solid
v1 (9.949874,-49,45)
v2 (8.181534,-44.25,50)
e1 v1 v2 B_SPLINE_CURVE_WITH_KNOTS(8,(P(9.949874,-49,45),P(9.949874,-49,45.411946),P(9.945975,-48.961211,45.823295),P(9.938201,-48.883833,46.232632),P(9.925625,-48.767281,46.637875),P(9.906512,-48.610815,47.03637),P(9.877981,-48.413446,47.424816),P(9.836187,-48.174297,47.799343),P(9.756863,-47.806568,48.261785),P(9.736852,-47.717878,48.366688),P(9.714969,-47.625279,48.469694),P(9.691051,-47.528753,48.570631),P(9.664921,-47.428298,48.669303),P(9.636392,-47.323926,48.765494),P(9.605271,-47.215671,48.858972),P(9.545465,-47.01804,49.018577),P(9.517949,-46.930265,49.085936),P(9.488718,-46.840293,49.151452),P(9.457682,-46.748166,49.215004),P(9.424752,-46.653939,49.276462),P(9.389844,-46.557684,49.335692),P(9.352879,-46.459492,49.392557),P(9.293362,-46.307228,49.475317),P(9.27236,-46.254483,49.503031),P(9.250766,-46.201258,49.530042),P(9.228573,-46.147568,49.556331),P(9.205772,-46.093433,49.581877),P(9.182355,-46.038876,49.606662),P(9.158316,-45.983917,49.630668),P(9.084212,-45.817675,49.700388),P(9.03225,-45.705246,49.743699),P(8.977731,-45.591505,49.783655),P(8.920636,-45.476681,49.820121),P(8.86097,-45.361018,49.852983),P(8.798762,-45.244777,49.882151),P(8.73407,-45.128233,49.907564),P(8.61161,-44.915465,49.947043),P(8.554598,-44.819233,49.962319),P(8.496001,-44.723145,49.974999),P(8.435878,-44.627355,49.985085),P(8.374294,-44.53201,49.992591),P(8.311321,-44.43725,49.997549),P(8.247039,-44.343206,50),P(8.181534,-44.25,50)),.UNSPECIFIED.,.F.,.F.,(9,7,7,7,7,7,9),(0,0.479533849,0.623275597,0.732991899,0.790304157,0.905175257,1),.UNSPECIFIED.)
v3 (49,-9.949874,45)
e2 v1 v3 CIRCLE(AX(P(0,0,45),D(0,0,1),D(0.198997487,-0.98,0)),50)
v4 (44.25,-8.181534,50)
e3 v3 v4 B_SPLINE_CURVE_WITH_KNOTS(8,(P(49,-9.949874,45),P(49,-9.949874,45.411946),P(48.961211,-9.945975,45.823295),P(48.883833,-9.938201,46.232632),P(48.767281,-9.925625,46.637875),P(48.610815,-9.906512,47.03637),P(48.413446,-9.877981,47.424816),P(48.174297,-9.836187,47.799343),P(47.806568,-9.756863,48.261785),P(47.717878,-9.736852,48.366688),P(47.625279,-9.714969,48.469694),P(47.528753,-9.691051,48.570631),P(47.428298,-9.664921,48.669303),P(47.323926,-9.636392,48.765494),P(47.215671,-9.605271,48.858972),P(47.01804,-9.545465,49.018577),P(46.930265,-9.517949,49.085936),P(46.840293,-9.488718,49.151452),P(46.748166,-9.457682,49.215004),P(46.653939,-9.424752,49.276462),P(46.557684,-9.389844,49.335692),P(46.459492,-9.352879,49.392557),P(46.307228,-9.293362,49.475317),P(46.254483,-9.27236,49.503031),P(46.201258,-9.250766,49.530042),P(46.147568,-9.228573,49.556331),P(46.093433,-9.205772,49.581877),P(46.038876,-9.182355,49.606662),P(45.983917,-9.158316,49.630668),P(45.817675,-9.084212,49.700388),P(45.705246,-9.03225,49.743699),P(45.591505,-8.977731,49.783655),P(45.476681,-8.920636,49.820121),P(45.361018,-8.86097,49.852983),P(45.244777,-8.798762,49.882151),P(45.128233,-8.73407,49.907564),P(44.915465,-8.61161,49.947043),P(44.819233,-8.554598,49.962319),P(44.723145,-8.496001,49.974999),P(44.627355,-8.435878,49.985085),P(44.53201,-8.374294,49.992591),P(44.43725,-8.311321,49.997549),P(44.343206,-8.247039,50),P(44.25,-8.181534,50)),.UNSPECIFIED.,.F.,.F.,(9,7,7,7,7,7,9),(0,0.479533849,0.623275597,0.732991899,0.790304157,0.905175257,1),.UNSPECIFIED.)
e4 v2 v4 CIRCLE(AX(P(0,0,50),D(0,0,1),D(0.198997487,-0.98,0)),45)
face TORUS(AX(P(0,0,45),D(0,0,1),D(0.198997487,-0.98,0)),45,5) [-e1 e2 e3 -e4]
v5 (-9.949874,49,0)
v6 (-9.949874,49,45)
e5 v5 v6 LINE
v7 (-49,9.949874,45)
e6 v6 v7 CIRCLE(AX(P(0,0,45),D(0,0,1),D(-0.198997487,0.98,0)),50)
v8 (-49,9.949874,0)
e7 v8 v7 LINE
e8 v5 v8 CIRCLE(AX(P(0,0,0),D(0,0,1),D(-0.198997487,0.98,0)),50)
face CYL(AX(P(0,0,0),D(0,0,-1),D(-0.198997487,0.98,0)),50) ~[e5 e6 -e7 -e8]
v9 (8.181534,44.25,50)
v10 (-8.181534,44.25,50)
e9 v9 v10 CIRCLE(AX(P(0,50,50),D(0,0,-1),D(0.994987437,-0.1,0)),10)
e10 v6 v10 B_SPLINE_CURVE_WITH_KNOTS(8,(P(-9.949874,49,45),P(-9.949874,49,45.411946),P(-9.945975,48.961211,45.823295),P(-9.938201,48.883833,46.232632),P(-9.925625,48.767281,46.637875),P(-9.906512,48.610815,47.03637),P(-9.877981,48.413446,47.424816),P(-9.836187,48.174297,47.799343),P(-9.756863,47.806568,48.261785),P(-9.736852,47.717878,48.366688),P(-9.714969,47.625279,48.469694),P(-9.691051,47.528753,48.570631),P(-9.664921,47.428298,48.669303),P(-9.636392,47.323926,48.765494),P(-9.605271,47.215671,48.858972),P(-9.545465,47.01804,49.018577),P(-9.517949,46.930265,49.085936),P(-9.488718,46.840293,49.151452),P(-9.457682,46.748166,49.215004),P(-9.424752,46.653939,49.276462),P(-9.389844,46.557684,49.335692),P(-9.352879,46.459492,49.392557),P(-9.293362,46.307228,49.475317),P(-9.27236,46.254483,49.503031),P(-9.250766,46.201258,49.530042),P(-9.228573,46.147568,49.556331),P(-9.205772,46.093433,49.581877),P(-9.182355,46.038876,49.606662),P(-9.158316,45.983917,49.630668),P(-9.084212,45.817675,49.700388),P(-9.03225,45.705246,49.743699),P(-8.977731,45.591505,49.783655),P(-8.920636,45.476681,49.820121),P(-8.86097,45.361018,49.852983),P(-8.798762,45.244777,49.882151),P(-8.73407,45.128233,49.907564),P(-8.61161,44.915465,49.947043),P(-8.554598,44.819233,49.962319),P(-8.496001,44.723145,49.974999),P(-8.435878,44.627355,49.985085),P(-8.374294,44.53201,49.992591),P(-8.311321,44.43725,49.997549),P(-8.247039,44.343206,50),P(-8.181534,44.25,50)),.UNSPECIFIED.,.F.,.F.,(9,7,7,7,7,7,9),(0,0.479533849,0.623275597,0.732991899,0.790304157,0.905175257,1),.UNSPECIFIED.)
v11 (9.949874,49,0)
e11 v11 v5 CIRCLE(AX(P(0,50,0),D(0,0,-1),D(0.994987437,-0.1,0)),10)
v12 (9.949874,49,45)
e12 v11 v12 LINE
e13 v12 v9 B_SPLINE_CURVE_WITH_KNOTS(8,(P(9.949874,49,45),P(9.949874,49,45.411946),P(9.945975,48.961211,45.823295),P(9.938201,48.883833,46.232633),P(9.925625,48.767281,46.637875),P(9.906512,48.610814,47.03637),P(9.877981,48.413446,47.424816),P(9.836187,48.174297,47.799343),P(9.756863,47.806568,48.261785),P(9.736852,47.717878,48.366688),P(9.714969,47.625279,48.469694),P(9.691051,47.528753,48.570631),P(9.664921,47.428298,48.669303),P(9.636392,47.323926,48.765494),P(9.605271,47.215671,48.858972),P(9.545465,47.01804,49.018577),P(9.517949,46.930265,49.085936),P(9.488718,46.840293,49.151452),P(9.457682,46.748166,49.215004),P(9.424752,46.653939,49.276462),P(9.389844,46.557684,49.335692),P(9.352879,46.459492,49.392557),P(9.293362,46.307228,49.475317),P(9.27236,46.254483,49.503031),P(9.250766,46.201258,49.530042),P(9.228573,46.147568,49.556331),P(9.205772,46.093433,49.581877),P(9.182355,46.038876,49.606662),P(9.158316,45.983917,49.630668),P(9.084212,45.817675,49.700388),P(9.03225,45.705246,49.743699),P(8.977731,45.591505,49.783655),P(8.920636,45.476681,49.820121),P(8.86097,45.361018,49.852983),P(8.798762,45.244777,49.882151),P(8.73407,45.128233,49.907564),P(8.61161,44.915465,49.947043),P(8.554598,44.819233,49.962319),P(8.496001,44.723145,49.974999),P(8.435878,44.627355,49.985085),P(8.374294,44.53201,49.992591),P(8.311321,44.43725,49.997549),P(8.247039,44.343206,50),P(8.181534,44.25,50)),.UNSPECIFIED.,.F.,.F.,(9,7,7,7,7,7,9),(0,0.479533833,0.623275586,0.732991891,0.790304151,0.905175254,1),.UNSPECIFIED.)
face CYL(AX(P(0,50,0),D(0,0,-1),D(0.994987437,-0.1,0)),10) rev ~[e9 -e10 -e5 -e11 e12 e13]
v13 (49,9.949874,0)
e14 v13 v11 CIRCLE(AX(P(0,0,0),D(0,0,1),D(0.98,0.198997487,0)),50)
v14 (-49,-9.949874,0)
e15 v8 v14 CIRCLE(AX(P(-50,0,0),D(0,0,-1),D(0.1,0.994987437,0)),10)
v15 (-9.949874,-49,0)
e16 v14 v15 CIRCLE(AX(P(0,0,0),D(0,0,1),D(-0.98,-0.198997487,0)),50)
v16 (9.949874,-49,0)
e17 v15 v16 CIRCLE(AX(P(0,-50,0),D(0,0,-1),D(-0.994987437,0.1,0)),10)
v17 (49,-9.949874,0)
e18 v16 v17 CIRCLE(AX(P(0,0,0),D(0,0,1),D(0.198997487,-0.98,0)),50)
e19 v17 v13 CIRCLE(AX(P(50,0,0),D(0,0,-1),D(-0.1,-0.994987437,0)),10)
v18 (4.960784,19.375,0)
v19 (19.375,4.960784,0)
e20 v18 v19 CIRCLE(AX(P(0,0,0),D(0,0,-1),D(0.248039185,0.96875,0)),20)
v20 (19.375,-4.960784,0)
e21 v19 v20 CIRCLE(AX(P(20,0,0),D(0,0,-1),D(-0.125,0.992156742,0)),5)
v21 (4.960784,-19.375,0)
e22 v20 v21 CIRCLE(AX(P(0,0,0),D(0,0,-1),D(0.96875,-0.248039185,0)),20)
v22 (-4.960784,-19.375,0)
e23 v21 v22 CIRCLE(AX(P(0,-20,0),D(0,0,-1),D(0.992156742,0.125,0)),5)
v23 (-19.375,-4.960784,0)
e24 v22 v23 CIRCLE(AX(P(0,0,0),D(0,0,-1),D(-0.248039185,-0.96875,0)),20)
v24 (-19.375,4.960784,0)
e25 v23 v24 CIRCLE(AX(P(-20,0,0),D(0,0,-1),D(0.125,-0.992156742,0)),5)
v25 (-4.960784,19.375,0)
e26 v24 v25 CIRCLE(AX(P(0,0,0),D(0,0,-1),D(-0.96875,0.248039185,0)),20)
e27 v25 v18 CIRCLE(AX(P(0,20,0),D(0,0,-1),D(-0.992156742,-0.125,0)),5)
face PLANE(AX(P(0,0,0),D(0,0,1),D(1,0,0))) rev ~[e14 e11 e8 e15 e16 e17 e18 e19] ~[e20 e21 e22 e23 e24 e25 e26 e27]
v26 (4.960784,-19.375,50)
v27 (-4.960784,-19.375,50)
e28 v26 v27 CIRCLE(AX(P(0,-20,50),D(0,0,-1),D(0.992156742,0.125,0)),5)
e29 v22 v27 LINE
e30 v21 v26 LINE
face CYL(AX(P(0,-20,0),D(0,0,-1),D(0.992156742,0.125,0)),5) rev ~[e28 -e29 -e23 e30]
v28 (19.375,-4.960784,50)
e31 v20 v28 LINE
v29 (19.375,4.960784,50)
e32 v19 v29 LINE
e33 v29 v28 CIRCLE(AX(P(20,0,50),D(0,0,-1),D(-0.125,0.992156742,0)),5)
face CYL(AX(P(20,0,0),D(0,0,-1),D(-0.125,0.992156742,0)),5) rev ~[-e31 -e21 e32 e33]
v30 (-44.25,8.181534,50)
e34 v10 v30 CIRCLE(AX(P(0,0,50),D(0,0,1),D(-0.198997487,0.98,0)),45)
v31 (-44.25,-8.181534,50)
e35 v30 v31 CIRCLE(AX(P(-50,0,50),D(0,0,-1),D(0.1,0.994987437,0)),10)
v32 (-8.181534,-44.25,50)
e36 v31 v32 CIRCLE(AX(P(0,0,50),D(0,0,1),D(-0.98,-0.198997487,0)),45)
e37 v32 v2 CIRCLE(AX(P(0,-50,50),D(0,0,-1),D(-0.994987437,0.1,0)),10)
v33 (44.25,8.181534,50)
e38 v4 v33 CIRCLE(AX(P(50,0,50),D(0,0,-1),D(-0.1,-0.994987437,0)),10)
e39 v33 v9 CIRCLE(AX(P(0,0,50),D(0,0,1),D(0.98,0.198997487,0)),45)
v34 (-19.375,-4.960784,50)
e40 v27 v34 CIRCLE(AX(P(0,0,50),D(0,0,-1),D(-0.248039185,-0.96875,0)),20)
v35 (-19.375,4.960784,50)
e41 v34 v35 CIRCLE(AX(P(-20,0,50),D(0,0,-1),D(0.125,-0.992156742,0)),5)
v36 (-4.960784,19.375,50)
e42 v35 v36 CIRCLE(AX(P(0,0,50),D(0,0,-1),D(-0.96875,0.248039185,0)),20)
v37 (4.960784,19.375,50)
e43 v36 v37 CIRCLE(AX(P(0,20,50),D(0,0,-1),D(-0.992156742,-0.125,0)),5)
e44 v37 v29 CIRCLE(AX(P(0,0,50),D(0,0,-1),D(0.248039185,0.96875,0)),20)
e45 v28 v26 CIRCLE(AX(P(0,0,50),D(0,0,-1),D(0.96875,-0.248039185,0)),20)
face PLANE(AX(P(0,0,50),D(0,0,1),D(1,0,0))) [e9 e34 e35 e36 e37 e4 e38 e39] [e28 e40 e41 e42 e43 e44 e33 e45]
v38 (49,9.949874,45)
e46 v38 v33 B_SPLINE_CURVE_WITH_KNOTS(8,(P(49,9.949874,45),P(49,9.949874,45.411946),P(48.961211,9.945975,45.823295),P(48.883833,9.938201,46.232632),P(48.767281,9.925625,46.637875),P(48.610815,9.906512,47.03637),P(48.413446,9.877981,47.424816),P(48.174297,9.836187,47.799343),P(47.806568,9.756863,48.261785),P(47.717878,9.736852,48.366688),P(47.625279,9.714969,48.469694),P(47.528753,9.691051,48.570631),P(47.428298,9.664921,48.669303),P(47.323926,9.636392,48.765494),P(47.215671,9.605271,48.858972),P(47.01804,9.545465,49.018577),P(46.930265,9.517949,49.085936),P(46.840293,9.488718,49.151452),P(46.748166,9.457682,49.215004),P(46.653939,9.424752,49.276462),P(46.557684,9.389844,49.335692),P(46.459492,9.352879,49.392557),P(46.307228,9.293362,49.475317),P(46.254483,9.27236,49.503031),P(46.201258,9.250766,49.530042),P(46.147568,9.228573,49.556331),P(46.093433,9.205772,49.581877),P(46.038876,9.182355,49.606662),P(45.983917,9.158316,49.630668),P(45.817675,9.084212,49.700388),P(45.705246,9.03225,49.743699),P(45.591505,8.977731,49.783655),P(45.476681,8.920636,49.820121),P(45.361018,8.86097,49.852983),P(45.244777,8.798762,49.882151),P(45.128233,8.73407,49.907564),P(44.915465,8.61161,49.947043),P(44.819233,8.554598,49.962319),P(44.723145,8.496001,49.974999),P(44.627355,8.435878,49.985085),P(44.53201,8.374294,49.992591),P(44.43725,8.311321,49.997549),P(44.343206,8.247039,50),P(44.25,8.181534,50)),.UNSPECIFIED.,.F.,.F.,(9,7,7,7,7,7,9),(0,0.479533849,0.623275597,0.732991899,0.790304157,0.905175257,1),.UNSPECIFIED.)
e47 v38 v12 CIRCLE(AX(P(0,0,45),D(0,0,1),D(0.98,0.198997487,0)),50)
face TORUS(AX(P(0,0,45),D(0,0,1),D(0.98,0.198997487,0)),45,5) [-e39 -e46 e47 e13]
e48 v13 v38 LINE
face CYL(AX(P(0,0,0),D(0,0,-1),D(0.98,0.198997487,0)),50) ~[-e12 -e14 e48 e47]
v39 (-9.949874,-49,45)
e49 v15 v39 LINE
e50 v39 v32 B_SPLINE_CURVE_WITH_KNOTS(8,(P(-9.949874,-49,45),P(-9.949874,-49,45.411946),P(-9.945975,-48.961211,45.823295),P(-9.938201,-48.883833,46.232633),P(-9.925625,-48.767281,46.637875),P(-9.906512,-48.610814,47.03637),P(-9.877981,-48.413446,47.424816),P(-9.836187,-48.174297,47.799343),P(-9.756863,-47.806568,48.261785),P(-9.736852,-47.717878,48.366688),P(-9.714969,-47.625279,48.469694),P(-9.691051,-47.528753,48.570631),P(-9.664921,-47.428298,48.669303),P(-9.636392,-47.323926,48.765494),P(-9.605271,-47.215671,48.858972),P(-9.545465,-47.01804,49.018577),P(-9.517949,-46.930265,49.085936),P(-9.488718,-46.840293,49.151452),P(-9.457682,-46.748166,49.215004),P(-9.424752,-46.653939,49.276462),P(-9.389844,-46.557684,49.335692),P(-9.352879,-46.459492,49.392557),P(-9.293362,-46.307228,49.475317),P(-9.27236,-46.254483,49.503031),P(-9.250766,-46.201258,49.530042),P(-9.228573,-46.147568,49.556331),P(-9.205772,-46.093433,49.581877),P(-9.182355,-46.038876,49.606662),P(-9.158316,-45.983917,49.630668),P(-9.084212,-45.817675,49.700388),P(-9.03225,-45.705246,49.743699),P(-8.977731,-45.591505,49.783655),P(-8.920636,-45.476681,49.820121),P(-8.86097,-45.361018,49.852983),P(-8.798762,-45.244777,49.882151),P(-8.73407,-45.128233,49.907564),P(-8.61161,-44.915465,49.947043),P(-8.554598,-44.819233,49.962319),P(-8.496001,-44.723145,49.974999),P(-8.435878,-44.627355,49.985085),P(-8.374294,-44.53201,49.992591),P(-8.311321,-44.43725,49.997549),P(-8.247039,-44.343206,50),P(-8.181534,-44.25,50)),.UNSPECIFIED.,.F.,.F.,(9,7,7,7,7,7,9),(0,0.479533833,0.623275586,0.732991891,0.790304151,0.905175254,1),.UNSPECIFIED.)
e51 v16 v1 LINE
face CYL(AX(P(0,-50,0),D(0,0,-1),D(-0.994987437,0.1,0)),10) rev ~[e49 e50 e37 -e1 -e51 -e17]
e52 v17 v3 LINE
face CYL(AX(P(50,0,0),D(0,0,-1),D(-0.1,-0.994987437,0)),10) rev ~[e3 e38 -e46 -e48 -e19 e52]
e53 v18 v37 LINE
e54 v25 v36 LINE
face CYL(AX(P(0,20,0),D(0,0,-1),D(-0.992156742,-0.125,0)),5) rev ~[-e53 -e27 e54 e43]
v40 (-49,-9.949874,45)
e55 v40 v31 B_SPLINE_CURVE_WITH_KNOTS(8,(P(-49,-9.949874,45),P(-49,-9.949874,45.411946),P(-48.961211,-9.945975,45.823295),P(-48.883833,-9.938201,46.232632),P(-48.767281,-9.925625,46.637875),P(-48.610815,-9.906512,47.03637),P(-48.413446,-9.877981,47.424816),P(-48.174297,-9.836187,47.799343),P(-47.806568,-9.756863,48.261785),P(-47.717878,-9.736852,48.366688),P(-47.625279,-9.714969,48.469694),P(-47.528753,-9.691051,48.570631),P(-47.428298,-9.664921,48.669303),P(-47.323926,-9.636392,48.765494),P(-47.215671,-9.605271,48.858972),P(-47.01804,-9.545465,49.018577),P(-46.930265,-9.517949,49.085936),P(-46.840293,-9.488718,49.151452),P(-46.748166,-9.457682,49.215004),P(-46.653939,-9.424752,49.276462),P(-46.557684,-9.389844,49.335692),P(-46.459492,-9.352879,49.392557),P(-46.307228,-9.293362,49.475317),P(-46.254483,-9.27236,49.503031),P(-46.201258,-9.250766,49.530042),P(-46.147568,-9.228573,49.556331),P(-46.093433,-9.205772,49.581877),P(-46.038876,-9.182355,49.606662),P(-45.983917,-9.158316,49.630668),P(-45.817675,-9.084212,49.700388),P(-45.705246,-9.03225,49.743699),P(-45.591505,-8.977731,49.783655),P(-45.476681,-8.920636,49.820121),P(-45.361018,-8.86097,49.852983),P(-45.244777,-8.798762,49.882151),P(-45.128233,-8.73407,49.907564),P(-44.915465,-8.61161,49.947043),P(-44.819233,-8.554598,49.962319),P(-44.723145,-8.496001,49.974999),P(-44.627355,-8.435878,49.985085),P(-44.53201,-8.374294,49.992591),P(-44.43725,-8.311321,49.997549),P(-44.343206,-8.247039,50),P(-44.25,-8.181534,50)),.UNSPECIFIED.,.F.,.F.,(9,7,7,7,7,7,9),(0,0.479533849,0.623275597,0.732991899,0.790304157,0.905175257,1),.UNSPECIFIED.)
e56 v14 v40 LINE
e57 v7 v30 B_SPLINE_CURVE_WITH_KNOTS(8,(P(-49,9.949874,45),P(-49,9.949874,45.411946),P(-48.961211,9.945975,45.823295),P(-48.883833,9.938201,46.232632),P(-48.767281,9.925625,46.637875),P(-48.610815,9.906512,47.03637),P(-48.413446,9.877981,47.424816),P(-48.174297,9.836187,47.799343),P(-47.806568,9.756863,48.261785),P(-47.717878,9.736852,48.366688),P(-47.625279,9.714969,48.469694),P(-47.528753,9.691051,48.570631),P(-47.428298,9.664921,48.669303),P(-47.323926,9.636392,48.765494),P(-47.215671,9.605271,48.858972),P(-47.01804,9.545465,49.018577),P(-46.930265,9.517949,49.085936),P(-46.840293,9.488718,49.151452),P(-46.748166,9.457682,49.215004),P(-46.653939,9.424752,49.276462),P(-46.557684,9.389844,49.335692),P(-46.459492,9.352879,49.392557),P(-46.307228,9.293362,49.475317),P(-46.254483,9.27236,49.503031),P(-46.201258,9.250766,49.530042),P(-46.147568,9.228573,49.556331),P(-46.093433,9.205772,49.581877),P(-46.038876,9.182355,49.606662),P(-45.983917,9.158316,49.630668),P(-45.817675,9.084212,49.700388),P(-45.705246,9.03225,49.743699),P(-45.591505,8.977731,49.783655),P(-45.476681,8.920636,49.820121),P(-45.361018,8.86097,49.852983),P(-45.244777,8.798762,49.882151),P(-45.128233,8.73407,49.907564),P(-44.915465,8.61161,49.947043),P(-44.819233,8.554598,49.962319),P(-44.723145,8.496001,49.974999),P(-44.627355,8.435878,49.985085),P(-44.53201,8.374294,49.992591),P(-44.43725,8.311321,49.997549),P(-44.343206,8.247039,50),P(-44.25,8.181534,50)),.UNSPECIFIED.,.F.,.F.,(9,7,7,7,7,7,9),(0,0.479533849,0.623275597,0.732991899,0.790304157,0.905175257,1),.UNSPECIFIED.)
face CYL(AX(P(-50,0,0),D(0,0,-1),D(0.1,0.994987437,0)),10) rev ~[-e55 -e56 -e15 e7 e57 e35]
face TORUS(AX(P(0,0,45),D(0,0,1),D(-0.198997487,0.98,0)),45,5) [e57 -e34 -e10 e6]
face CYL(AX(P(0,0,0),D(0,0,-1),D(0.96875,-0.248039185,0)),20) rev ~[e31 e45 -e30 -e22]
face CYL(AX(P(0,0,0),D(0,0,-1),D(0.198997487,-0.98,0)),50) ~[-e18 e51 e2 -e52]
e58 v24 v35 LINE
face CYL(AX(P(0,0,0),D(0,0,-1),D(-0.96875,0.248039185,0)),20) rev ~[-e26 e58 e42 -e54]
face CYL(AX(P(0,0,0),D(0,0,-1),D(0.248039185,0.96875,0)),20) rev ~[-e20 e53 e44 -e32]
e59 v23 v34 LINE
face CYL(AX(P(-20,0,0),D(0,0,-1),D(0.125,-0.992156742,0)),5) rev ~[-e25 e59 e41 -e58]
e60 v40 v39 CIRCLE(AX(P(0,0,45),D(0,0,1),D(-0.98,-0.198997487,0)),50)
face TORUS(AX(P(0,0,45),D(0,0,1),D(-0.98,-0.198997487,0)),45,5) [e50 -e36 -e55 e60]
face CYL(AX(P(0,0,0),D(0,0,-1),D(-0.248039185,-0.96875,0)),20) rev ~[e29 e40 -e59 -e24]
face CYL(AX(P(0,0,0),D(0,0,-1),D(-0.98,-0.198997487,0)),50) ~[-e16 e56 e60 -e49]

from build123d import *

# Parameters (mm, degrees)
F1_DEPTH = 50
F5_R     = 5


# Not quite as in the source:
# - the program builds the solid bodies; features that only make, move or delete a surface that nothing else refers to are left out


with BuildPart() as f1:
    # F0 (on Top) → F1 (new body)
    with BuildSketch(Plane.XY):
        with BuildLine():
            ThreePointArc((9.9498743711, 49), (0, 40), (-9.9498743711, 49))
            ThreePointArc((-9.9498743711, 49), (-35.3553390593, 35.3553390593), (-49, 9.9498743711))
            ThreePointArc((-49, 9.9498743711), (-40, 0), (-49, -9.9498743711))
            ThreePointArc((-49, -9.9498743711), (-35.3553390593, -35.3553390593), (-9.9498743711, -49))
            ThreePointArc((-9.9498743711, -49), (0, -40), (9.9498743711, -49))
            ThreePointArc((9.9498743711, -49), (35.3553390593, -35.3553390593), (49, -9.9498743711))
            ThreePointArc((49, -9.9498743711), (40, 0), (49, 9.9498743711))
            ThreePointArc((49, 9.9498743711), (35.3553390593, 35.3553390593), (9.9498743711, 49))
        make_face()
        with BuildLine():
            ThreePointArc((-4.9607837082, -19.375), (-14.1421356237, -14.1421356237), (-19.375, -4.9607837082))
            ThreePointArc((-19.375, -4.9607837082), (-25, 0), (-19.375, 4.9607837082))
            ThreePointArc((-19.375, 4.9607837082), (-14.1421356237, 14.1421356237), (-4.9607837082, 19.375))
            ThreePointArc((-4.9607837082, 19.375), (0, 25), (4.9607837082, 19.375))
            ThreePointArc((4.9607837082, 19.375), (14.1421356237, 14.1421356237), (19.375, 4.9607837082))
            ThreePointArc((19.375, 4.9607837082), (25, 0), (19.375, -4.9607837082))
            ThreePointArc((19.375, -4.9607837082), (14.1421356237, -14.1421356237), (4.9607837082, -19.375))
            ThreePointArc((4.9607837082, -19.375), (0, -25), (-4.9607837082, -19.375))
        make_face(mode=Mode.SUBTRACT)
    extrude(amount=F1_DEPTH)

    # F5
    f5_edges = [f1.edges().sort_by_distance(p)[0] for p in [
        (35.355339, -35.355339, 50),
        (35.355339, 35.355339, 50),
        (-35.355339, -35.355339, 50),
        (-35.355339, 35.355339, 50),
    ]]
    fillet(f5_edges, radius=F5_R)


solid = f1.part
